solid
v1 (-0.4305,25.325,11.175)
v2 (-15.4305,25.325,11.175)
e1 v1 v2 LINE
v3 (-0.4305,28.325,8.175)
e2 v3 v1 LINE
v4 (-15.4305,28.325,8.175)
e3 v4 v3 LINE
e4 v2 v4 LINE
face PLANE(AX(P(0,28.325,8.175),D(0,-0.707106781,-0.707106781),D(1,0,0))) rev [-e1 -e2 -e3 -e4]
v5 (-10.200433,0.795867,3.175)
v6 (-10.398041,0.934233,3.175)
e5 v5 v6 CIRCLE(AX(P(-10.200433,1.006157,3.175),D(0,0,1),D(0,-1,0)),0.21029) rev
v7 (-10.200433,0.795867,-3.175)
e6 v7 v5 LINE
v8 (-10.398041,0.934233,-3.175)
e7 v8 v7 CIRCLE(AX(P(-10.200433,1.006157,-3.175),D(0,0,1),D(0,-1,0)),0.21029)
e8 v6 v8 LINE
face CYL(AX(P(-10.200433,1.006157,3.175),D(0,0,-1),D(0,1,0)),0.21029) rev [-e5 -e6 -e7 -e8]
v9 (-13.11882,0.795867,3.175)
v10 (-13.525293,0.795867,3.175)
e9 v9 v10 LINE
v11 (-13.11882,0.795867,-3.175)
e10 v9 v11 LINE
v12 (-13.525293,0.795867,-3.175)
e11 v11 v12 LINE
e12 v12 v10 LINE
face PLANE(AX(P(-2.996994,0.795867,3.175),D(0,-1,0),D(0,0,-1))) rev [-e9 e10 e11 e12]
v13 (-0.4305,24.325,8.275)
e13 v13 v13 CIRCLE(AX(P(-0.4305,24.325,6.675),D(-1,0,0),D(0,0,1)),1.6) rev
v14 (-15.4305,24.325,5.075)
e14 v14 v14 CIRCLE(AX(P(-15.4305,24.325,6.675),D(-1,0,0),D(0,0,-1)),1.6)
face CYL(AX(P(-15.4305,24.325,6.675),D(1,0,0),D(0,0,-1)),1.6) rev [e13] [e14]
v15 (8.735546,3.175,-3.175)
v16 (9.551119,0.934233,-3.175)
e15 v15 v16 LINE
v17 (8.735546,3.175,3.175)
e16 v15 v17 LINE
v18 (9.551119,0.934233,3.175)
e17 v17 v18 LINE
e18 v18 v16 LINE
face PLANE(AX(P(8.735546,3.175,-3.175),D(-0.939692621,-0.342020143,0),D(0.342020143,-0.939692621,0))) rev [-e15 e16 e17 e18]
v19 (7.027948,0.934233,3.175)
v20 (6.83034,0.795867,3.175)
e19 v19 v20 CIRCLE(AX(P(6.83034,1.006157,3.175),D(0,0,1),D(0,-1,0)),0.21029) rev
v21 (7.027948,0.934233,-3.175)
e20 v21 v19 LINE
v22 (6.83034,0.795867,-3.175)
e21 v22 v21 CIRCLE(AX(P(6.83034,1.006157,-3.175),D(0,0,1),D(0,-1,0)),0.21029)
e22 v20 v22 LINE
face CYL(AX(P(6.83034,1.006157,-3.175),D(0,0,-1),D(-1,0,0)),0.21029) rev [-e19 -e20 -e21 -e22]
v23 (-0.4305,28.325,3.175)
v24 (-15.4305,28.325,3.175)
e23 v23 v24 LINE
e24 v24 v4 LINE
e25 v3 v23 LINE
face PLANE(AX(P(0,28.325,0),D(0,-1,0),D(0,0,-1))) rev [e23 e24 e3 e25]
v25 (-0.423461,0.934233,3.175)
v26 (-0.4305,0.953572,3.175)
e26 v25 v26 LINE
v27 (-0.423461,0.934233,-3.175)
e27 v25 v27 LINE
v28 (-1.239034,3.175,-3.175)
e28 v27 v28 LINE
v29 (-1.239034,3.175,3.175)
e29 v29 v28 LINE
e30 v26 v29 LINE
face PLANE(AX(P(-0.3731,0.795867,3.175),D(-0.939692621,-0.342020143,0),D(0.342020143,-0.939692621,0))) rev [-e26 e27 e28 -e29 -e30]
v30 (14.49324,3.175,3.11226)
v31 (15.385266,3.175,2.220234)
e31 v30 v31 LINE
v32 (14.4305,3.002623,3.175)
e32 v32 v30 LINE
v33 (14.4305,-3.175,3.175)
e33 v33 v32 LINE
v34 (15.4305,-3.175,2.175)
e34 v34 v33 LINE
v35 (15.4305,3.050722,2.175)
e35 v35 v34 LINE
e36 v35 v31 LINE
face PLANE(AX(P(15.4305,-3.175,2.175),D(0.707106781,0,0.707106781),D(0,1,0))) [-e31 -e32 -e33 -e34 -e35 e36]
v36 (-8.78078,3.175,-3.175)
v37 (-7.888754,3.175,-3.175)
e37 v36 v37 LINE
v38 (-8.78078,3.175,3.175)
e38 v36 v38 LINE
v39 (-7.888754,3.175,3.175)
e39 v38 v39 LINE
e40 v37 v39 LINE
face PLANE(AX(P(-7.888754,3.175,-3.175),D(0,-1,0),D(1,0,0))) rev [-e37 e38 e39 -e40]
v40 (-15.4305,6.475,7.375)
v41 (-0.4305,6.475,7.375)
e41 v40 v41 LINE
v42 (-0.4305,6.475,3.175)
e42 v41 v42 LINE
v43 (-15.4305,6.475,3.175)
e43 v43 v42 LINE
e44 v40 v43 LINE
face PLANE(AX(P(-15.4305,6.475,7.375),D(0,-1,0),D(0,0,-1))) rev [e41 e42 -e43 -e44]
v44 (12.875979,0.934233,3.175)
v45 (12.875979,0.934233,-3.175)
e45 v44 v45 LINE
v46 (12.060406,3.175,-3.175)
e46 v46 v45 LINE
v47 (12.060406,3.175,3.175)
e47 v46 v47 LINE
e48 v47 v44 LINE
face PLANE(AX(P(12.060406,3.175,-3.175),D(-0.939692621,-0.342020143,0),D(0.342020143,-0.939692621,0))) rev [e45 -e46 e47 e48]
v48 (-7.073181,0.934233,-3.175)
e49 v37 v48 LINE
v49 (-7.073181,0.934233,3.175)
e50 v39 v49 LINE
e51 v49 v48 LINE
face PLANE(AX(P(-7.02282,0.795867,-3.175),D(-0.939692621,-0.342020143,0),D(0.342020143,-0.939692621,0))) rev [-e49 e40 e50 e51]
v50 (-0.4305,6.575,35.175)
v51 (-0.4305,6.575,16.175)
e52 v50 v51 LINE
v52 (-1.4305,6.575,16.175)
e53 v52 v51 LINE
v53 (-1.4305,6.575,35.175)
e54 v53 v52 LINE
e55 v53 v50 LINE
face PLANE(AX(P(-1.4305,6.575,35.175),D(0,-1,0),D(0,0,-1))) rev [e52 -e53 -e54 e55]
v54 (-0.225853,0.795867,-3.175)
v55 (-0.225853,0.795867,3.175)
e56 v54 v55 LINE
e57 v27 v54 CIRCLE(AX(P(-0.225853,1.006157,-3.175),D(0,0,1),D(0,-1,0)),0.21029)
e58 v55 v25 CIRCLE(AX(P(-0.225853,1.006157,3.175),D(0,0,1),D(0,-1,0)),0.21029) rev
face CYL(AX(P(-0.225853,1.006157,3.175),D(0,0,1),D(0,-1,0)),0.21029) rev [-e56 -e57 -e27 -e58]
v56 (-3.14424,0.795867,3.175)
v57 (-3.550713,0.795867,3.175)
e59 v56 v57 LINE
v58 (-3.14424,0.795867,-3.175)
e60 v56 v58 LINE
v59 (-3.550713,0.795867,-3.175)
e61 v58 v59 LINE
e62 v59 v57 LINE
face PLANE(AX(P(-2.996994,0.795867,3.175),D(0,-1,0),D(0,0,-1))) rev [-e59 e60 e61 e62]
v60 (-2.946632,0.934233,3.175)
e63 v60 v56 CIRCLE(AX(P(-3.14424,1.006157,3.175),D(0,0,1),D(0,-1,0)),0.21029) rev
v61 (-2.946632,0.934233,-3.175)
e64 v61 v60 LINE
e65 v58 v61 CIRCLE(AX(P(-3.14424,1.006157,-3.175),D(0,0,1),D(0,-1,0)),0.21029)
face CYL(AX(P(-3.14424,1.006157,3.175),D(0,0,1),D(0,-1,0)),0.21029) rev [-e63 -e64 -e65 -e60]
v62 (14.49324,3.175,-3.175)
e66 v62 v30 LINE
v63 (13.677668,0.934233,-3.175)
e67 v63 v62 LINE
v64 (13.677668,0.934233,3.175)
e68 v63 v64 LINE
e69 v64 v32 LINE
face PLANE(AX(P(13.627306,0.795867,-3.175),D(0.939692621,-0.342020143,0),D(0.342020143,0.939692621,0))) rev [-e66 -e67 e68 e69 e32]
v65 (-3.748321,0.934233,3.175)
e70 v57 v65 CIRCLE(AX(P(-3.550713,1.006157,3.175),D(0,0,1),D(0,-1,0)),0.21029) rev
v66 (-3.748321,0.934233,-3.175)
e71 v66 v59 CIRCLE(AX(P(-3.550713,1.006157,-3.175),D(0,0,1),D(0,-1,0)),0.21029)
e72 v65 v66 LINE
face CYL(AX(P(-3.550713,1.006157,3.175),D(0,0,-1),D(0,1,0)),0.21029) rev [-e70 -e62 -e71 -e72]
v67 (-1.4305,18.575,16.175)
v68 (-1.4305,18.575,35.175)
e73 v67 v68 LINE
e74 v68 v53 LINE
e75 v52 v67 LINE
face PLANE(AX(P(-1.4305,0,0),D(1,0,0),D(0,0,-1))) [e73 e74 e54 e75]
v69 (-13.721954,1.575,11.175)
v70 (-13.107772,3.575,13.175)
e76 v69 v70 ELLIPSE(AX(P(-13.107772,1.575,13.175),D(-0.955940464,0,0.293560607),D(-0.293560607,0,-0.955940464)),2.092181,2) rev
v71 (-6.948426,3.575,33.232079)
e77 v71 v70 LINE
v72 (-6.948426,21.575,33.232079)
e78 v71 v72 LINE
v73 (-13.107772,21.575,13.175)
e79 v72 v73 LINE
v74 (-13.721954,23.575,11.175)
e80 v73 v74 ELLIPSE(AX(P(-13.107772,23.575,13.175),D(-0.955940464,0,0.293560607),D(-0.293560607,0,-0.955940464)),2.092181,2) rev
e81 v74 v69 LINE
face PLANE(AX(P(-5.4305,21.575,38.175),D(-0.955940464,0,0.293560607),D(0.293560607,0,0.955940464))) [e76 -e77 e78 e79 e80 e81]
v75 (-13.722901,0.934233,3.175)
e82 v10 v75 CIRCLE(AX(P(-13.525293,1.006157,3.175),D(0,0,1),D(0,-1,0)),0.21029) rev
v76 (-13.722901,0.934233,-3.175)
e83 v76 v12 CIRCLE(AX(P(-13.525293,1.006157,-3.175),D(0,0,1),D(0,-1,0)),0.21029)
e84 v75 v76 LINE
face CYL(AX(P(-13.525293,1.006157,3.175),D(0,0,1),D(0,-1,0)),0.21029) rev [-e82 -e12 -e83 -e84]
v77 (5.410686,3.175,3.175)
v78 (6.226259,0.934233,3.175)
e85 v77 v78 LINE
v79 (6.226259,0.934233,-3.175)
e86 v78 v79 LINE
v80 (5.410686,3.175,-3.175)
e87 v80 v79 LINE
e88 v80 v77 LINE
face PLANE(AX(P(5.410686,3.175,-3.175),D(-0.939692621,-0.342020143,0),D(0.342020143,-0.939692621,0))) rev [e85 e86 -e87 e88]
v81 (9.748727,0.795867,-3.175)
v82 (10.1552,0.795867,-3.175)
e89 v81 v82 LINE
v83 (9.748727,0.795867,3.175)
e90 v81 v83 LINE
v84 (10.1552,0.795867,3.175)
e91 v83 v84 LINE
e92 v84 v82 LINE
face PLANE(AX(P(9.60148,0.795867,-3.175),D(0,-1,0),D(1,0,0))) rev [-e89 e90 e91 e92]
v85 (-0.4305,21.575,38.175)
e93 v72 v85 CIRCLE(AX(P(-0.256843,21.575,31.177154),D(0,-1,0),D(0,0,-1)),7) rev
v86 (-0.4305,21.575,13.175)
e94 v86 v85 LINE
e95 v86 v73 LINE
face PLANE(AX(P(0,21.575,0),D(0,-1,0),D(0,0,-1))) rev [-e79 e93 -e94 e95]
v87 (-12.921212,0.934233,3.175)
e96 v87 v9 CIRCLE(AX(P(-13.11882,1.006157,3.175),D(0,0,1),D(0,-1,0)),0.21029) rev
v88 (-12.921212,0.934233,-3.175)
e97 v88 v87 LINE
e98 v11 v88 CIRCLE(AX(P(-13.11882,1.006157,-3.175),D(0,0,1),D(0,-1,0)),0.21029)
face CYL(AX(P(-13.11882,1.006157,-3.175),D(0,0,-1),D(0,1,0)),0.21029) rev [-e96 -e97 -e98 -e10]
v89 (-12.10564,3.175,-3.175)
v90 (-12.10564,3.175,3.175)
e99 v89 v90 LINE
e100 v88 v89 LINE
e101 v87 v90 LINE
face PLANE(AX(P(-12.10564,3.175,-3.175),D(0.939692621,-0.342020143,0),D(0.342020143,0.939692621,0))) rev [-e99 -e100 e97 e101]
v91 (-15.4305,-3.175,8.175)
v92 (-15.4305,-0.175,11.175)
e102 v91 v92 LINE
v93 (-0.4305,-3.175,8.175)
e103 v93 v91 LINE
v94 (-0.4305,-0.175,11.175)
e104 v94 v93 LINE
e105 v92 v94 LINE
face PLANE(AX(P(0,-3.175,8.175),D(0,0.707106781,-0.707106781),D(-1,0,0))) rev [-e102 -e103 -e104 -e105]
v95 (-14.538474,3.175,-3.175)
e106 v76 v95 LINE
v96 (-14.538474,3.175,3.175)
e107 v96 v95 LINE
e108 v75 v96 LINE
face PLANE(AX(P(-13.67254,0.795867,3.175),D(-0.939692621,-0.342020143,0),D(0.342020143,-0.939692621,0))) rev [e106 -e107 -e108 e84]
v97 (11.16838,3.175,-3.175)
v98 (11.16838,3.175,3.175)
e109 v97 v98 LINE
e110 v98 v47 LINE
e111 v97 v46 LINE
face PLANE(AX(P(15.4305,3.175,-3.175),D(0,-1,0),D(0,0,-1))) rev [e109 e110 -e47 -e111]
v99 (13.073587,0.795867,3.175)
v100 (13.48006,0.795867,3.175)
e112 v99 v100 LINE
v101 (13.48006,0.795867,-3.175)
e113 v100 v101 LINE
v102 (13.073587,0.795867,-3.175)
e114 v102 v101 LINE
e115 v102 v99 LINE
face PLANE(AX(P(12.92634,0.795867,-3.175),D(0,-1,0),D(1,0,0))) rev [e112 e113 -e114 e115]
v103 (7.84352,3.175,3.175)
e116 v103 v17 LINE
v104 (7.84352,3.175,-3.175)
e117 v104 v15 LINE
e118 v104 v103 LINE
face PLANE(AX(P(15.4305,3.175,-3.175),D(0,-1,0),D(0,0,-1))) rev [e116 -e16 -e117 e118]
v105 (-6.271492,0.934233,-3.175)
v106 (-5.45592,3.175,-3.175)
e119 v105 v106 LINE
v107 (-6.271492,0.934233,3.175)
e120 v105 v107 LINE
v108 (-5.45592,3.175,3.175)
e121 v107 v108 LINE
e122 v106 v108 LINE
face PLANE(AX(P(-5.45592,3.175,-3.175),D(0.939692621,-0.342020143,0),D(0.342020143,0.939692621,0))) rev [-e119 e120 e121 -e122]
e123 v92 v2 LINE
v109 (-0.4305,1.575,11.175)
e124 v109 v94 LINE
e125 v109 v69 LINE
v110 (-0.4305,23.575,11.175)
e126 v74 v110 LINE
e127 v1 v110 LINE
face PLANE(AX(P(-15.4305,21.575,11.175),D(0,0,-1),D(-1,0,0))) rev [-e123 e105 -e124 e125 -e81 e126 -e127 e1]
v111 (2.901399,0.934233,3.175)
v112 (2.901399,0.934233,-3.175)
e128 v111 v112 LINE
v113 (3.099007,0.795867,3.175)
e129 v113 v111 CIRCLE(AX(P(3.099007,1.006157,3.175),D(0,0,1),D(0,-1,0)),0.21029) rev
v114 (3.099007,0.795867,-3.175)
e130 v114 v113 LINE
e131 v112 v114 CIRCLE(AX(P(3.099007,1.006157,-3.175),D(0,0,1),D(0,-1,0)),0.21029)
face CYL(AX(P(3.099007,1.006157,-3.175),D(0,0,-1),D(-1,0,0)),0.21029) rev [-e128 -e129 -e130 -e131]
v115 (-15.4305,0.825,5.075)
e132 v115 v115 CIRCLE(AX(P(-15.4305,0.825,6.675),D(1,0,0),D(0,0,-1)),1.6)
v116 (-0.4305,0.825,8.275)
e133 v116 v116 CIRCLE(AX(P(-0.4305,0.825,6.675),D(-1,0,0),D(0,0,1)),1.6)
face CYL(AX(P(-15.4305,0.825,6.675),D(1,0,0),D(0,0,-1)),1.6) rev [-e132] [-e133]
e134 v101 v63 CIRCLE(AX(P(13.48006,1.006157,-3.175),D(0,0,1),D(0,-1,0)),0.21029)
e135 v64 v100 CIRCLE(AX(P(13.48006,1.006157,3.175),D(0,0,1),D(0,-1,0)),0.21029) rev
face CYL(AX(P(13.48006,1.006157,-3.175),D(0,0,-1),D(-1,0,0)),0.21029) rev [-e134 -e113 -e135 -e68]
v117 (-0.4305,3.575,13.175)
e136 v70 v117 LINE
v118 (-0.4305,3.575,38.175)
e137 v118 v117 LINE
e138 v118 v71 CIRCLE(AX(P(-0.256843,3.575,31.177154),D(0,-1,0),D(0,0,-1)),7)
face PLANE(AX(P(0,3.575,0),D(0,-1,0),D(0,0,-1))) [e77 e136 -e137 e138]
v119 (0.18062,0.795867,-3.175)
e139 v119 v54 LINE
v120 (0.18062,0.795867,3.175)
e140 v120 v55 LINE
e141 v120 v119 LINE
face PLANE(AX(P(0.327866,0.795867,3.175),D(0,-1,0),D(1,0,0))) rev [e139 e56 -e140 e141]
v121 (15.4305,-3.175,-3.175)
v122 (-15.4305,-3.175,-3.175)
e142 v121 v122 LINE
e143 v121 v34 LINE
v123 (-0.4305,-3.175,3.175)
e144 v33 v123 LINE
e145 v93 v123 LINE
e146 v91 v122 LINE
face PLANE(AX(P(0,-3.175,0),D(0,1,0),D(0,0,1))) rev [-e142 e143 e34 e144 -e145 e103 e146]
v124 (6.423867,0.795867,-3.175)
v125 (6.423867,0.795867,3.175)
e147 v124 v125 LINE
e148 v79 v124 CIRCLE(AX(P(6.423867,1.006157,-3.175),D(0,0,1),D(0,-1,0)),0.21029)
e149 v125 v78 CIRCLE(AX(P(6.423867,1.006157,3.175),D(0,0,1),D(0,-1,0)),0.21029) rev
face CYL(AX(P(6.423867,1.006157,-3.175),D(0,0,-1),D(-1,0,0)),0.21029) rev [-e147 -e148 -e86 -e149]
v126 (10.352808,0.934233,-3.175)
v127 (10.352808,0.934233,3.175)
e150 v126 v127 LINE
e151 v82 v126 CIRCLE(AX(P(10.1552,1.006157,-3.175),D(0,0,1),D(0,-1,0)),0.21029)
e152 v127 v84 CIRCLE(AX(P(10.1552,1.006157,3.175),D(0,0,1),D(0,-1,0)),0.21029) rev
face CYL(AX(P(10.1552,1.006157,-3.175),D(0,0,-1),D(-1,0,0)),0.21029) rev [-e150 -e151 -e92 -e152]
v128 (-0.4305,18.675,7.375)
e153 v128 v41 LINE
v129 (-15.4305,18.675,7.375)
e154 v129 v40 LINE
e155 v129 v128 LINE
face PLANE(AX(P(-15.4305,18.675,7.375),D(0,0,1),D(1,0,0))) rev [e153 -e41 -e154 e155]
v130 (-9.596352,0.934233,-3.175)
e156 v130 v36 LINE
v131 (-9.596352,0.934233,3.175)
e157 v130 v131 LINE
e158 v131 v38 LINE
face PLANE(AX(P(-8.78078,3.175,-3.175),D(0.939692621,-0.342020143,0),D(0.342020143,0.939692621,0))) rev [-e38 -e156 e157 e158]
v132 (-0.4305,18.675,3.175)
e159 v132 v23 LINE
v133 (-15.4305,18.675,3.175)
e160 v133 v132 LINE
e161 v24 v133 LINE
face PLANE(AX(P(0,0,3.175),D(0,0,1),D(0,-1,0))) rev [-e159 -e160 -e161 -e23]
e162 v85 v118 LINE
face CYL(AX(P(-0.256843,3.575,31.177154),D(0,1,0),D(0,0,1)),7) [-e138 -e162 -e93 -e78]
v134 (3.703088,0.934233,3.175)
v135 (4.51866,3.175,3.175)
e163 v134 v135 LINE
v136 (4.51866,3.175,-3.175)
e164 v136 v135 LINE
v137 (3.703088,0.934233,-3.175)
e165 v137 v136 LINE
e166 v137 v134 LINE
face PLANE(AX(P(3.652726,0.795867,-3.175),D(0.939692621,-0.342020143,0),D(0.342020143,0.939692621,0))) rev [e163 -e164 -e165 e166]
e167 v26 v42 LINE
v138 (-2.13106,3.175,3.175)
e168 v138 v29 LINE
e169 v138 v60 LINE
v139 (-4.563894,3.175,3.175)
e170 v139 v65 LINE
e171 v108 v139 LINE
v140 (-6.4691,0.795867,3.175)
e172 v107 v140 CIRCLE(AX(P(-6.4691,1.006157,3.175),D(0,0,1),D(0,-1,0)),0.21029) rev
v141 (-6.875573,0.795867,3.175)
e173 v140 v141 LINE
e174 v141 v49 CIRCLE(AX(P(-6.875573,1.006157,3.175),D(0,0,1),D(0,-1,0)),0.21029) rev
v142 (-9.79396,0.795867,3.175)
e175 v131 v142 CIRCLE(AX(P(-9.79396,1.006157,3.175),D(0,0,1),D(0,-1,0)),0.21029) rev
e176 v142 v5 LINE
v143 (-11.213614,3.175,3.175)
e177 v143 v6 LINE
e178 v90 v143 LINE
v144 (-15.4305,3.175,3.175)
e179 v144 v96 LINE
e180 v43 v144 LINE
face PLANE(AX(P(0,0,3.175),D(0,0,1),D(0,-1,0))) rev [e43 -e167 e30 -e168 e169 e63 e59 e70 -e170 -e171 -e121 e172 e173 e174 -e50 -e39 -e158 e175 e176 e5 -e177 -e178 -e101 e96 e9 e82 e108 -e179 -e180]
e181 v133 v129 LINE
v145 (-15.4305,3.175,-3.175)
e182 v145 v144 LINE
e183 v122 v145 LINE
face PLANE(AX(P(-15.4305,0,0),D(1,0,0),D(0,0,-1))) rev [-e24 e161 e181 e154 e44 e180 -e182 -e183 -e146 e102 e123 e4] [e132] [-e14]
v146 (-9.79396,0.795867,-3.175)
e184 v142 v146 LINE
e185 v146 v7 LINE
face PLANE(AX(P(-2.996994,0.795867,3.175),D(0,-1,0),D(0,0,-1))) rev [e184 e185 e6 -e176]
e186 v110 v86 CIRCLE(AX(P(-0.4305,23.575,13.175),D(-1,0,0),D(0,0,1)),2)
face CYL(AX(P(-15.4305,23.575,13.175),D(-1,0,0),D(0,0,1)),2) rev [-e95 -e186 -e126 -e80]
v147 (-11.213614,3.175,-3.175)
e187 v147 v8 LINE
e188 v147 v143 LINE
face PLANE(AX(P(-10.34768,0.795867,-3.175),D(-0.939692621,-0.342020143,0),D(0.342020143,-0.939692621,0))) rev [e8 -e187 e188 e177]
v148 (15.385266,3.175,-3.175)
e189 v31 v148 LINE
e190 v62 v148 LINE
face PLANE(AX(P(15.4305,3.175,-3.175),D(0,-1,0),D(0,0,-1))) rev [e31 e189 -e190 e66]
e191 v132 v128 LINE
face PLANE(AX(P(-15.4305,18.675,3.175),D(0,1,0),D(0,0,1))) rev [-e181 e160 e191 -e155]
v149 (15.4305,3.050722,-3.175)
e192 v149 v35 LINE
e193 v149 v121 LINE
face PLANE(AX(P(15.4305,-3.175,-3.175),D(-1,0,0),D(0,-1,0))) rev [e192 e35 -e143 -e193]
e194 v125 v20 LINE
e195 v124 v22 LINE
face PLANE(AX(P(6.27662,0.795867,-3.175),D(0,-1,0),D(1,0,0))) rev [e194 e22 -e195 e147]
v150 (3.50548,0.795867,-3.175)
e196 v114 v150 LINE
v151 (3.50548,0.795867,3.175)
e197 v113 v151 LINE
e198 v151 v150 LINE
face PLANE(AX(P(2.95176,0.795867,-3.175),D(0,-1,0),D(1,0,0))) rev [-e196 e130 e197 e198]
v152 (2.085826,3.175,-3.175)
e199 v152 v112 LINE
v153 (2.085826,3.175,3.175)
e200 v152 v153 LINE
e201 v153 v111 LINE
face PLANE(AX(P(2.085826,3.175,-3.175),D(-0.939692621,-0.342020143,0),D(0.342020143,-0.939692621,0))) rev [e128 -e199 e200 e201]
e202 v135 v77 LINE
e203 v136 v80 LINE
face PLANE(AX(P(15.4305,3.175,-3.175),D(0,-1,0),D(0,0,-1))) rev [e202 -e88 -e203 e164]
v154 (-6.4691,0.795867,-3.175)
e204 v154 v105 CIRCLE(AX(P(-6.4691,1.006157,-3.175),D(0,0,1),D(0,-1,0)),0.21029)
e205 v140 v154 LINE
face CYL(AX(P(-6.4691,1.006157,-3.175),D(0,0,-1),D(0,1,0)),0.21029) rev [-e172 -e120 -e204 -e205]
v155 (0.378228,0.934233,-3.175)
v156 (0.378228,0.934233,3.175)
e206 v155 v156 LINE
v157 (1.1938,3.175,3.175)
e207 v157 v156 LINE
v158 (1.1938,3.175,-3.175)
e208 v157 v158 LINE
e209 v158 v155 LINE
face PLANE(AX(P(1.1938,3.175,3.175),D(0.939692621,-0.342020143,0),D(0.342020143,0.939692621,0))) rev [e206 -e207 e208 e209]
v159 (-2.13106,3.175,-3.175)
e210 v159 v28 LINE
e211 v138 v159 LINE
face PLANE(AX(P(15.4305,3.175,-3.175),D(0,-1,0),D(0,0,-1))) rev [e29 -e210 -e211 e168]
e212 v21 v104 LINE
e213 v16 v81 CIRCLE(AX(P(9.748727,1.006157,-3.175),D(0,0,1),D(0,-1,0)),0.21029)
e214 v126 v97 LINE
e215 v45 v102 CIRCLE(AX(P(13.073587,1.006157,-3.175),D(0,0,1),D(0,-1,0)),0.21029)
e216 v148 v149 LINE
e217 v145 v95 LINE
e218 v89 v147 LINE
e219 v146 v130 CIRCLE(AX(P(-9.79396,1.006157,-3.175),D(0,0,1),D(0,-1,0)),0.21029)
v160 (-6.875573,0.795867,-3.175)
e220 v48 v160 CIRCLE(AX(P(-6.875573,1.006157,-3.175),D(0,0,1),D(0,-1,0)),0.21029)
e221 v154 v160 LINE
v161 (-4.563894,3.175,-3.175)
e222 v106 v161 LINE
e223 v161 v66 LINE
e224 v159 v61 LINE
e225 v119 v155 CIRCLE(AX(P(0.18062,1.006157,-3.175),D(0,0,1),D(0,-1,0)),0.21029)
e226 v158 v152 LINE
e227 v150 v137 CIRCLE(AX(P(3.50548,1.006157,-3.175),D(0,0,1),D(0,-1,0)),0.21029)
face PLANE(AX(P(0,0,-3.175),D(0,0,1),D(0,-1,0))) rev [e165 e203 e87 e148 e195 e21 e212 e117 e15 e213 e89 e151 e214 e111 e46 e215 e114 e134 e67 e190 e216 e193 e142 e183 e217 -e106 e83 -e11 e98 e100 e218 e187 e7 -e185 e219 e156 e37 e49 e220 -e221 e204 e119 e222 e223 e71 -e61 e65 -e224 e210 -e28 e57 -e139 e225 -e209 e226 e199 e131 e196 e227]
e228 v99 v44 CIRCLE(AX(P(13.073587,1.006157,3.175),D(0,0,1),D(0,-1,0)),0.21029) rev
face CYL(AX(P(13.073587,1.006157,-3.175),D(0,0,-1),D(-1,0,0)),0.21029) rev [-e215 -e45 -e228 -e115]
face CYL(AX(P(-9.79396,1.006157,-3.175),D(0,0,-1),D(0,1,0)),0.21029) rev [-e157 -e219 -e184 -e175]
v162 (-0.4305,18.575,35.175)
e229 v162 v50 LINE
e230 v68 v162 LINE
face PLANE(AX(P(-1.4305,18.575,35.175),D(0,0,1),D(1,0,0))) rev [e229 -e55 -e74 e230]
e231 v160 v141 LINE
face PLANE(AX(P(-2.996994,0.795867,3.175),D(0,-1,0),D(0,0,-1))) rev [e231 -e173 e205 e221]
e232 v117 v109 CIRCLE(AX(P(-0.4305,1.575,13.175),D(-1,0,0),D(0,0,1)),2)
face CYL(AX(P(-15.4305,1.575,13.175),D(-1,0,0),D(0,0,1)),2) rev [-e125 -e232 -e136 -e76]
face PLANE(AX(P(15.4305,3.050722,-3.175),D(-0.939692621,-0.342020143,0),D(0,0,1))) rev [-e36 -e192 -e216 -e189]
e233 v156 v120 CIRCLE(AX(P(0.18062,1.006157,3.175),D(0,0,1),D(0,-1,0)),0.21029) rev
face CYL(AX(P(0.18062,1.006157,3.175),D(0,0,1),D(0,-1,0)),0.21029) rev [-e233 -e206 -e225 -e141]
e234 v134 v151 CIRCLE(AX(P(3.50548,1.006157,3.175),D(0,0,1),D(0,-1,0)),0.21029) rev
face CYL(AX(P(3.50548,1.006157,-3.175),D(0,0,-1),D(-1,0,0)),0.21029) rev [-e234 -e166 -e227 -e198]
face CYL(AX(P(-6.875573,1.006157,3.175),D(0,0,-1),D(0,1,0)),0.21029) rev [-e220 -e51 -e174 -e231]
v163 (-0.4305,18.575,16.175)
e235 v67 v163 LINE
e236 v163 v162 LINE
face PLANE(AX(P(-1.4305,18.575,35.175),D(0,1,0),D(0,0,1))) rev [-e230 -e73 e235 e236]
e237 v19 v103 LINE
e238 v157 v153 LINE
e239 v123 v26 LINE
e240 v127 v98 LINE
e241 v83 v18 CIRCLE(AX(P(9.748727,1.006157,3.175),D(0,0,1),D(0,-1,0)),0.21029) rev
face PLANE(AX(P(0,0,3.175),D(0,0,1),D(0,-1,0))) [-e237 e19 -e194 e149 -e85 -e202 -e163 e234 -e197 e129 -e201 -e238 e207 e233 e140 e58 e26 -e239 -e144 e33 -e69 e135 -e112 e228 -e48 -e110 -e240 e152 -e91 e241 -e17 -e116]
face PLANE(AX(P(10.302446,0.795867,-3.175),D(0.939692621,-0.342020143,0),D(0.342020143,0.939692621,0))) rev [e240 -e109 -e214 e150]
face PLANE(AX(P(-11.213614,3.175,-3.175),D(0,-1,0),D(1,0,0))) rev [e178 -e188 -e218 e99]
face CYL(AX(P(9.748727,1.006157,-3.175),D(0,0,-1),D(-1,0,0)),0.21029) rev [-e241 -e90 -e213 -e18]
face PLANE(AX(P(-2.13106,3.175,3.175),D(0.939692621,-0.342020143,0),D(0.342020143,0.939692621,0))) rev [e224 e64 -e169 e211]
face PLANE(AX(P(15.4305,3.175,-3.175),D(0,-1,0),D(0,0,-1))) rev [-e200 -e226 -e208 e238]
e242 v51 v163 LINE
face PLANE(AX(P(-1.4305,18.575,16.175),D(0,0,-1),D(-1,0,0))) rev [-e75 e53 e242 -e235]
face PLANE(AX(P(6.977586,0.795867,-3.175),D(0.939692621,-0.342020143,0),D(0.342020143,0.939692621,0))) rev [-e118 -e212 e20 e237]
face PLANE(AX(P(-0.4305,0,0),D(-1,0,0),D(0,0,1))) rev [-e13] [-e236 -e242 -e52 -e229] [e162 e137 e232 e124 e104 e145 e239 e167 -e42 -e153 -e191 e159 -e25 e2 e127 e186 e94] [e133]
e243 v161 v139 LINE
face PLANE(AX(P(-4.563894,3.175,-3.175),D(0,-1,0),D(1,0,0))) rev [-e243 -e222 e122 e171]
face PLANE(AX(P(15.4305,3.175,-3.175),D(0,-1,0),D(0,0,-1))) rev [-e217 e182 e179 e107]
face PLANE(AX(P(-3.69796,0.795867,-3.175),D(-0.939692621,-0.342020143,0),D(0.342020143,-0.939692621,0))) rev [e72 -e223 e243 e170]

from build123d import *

# Parameters (mm, degrees)
BOSS_EXTRUDE1_DEPTH  = 18
SKETCH2_W            = 8.291454006
SKETCH2_H            = 18
BOSS_EXTRUDE2_DEPTH  = 8
SKETCH3_W            = 8
SKETCH3_H            = 18
BOSS_EXTRUDE3_DEPTH  = 1.708545994
SKETCH4_W            = 10
SKETCH4_H            = 8
BOSS_EXTRUDE4_DEPTH  = 6.75
BOSS_EXTRUDE5_DEPTH  = 5
SKETCH6_W            = 30.861
SKETCH6_H            = 6.35
BOSS_EXTRUDE6_DEPTH  = 6.35
SKETCH7_W            = 15
SKETCH7_H            = 8
BOSS_EXTRUDE7_DEPTH  = 6.75
CUT_EXTRUDE1_DEPTH   = 6.35
CUT_EXTRUDE2_DEPTH   = 6.35
BOSS_EXTRUDE8_DEPTH  = 6.35
BOSS_EXTRUDE9_DEPTH  = 6.35
BOSS_EXTRUDE10_DEPTH = 6.35
CUT_EXTRUDE3_DEPTH   = 48.596280897
CUT_EXTRUDE4_DEPTH   = 48.596280897
CUT_EXTRUDE5_DEPTH   = 48.596280897
CUT_EXTRUDE6_DEPTH   = 48.596280897
SKETCH17_W           = 4.2
SKETCH17_H           = 12.2
CUT_EXTRUDE7_DEPTH   = 51.111950381
CHAMFER1_SIZE        = 3
FILLET1_START        = -4
FILLET1_DEPTH        = 8
FILLET1_START_2      = -3.175
FILLET1_2_DEPTH      = 6.35
FILLET1_START_3      = 12.448968436
FILLET1_3_OUTLINE_W  = 5
FILLET1_3_OUTLINE_H  = 8.175
FILLET1_3_DEPTH      = 1.551031564
FILLET2_R            = 2
SKETCH20_W           = 19
SKETCH20_H           = 12
CUT_EXTRUDE8_DEPTH   = 1
SKETCH21_R           = 1.6
CUT_EXTRUDE9_DEPTH   = 51.111950381
FILLET3_R            = 7


with BuildPart() as part:
    # Sketch1 → Boss-Extrude1 (new body)
    with BuildSketch(Plane.XZ.offset(-3.575)):
        Polygon((-13.721954006, 11.175), (-5.4305, 11.175), (-5.4305, 38.175), align=None)
    extrude(amount=-BOSS_EXTRUDE1_DEPTH)

    # Sketch2 → Boss-Extrude2 (add)
    with BuildSketch(Plane(origin=(0, 0, 11.175), x_dir=(-1, 0, 0), z_dir=(0, 0, -1))):
        with Locations((9.576227003, 12.575)):
            Rectangle(SKETCH2_W, SKETCH2_H)
    extrude(amount=BOSS_EXTRUDE2_DEPTH)

    # Sketch3 → Boss-Extrude3 (add)
    with BuildSketch(Plane.ZY.offset(13.721954006)):
        with Locations((7.175, 12.575)):
            Rectangle(SKETCH3_W, SKETCH3_H)
    extrude(amount=BOSS_EXTRUDE3_DEPTH)

    # Sketch4 → Boss-Extrude4 (add)
    with BuildSketch(Plane.XZ.offset(-3.575)):
        with Locations((-10.4305, 7.175)):
            Rectangle(SKETCH4_W, SKETCH4_H)
    extrude(amount=BOSS_EXTRUDE4_DEPTH)

    # Sketch5 → Boss-Extrude5 (add)
    with BuildSketch(Plane(origin=(-5.4305, 0, 0), x_dir=(0, 0, -1), z_dir=(1, 0, 0))):
        Polygon((-3.175, 21.575), (-3.175, -3.175), (-11.175, -3.175), (-11.175, 3.575), (-38.175, 3.575), (-38.175, 21.575), align=None)
    extrude(amount=BOSS_EXTRUDE5_DEPTH)

    # Sketch6 → Boss-Extrude6 (add)
    with BuildSketch(Plane(origin=(0, 0, 3.175), x_dir=(-1, 0, 0), z_dir=(0, 0, -1))):
        Rectangle(SKETCH6_W, SKETCH6_H)
    extrude(amount=BOSS_EXTRUDE6_DEPTH)

    # Sketch7 → Boss-Extrude7 (add)
    with BuildSketch(Plane(origin=(0, 21.575, 0), x_dir=(-1, 0, 0), z_dir=(0, 1, 0))):
        with Locations((7.9305, 7.175)):
            Rectangle(SKETCH7_W, SKETCH7_H)
    extrude(amount=BOSS_EXTRUDE7_DEPTH)

    # Sketch8 → Cut-Extrude1 (cut)
    with BuildSketch(Plane(origin=(0, 0, -3.175), x_dir=(-1, 0, 0), z_dir=(0, 0, -1))):
        Polygon((1.239033663, 3.175), (-1.1938, 3.175), (-0.327866283, 0.795866667), (0.373099946, 0.795866667), align=None)
    extrude(amount=-CUT_EXTRUDE1_DEPTH, mode=Mode.SUBTRACT)

    # Sketch9 → Cut-Extrude2 (cut)
    with BuildSketch(Plane(origin=(0, 0, -3.175), x_dir=(-1, 0, 0), z_dir=(0, 0, -1))):
        Polygon((2.13106, 3.175), (2.996993717, 0.795866667), (13.672539946, 0.795866667), (14.538473663, 3.175), align=None)
    extrude(amount=-CUT_EXTRUDE2_DEPTH, mode=Mode.SUBTRACT)

    # Sketch10 → Boss-Extrude8 (add)
    with BuildSketch(Plane(origin=(0, 0, 3.175), x_dir=(-1, 0, 0), z_dir=(0, 0, -1))):
        Polygon((10.347679946, 0.795866667), (11.213613663, 3.175), (12.10564, 3.175), (12.971573717, 0.795866667), align=None)
    extrude(amount=BOSS_EXTRUDE8_DEPTH)

    # Sketch11 → Boss-Extrude9 (add)
    with BuildSketch(Plane(origin=(0, 0, 3.175), x_dir=(-1, 0, 0), z_dir=(0, 0, -1))):
        Polygon((7.022819946, 0.795866667), (7.888753663, 3.175), (8.78078, 3.175), (9.646713717, 0.795866667), align=None)
    extrude(amount=BOSS_EXTRUDE9_DEPTH)

    # Sketch12 → Boss-Extrude10 (add)
    with BuildSketch(Plane(origin=(0, 0, 3.175), x_dir=(-1, 0, 0), z_dir=(0, 0, -1))):
        Polygon((3.697959946, 0.795866667), (4.563893663, 3.175), (5.45592, 3.175), (6.321853717, 0.795866667), align=None)
    extrude(amount=BOSS_EXTRUDE10_DEPTH)

    # Sketch13 → Cut-Extrude3 (cut, through all)
    with BuildSketch(Plane.XY.offset(3.175)):
        Polygon((2.085826337, 3.175), (2.951760054, 0.795866667), (3.652726283, 0.795866667), (4.51866, 3.175), align=None)
    extrude(amount=-CUT_EXTRUDE3_DEPTH, mode=Mode.SUBTRACT)

    # Sketch14 → Cut-Extrude4 (cut, through all)
    with BuildSketch(Plane.XY.offset(3.175)):
        Polygon((5.410686337, 3.175), (6.276620054, 0.795866667), (6.977586283, 0.795866667), (7.84352, 3.175), align=None)
    extrude(amount=-CUT_EXTRUDE4_DEPTH, mode=Mode.SUBTRACT)

    # Sketch15 → Cut-Extrude5 (cut, through all)
    with BuildSketch(Plane.XY.offset(3.175)):
        Polygon((8.735546337, 3.175), (9.601480054, 0.795866667), (10.302446283, 0.795866667), (11.16838, 3.175), align=None)
    extrude(amount=-CUT_EXTRUDE5_DEPTH, mode=Mode.SUBTRACT)

    # Sketch16 → Cut-Extrude6 (cut, through all)
    with BuildSketch(Plane.XY.offset(3.175)):
        Polygon((12.060406337, 3.175), (12.926340054, 0.795866667), (13.627306283, 0.795866667), (14.49324, 3.175), align=None)
    extrude(amount=-CUT_EXTRUDE6_DEPTH, mode=Mode.SUBTRACT)

    # Sketch17 → Cut-Extrude7 (cut, through all)
    with BuildSketch(Plane(origin=(-0.4305, 0, 0), x_dir=(0, 0, -1), z_dir=(1, 0, 0))):
        with Locations((-5.275, 12.575)):
            Rectangle(SKETCH17_W, SKETCH17_H)
    extrude(amount=-CUT_EXTRUDE7_DEPTH, mode=Mode.SUBTRACT)

    # Chamfer1
    chamfer1_edges = [part.edges().sort_by_distance(p)[0] for p in [
        (-7.9305, -3.175, 11.175),
        (-7.9305, 28.325, 11.175),
    ]]
    chamfer(chamfer1_edges, length=CHAMFER1_SIZE)

    # Fillet1: read off the stored shape, not the designer's step
    # Fillet1 outline → Fillet1 (cut)
    with BuildSketch(Plane.XY.offset(FILLET1_START)):
        Polygon((15.4305, 3.175), (15.385266337, 3.175), (15.4305, 3.050721534), align=None)
    extrude(amount=FILLET1_DEPTH, mode=Mode.SUBTRACT)

    # Fillet1 2 outline → Fillet1 2 (add)
    with BuildSketch(Plane.XY.offset(FILLET1_START_2)):
        with BuildLine():
            Line((12.926340054, 0.795866667), (13.073586605, 0.795866667))
            ThreePointArc((13.073586605, 0.795866667), (12.952969292, 0.83389716), (12.875978768, 0.934233164))
            Line((12.875978768, 0.934233164), (12.926340054, 0.795866667))
        make_face()
        with BuildLine():
            Line((13.627306283, 0.795866667), (13.67766757, 0.934233164))
            ThreePointArc((13.67766757, 0.934233164), (13.600677045, 0.83389716), (13.480059732, 0.795866667))
            Line((13.480059732, 0.795866667), (13.627306283, 0.795866667))
        make_face()
        with BuildLine():
            Line((-3.697959946, 0.795866667), (-3.550713395, 0.795866667))
            ThreePointArc((-3.550713395, 0.795866667), (-3.671330708, 0.83389716), (-3.748321232, 0.934233164))
            Line((-3.748321232, 0.934233164), (-3.697959946, 0.795866667))
        make_face()
        with BuildLine():
            ThreePointArc((-2.94663243, 0.934233164), (-3.023622955, 0.83389716), (-3.144240268, 0.795866667))
            Line((-3.144240268, 0.795866667), (-2.996993717, 0.795866667))
            Line((-2.996993717, 0.795866667), (-2.94663243, 0.934233164))
        make_face()
        with BuildLine():
            Line((6.977586283, 0.795866667), (7.02794757, 0.934233164))
            ThreePointArc((7.02794757, 0.934233164), (6.950957045, 0.83389716), (6.830339732, 0.795866667))
            Line((6.830339732, 0.795866667), (6.977586283, 0.795866667))
        make_face()
        with BuildLine():
            Line((6.276620054, 0.795866667), (6.423866605, 0.795866667))
            ThreePointArc((6.423866605, 0.795866667), (6.303249292, 0.83389716), (6.226258768, 0.934233164))
            Line((6.226258768, 0.934233164), (6.276620054, 0.795866667))
        make_face()
        with BuildLine():
            Line((3.652726283, 0.795866667), (3.70308757, 0.934233164))
            ThreePointArc((3.70308757, 0.934233164), (3.626097045, 0.83389716), (3.505479732, 0.795866667))
            Line((3.505479732, 0.795866667), (3.652726283, 0.795866667))
        make_face()
        with BuildLine():
            Line((2.951760054, 0.795866667), (3.099006605, 0.795866667))
            ThreePointArc((3.099006605, 0.795866667), (2.978389292, 0.83389716), (2.901398768, 0.934233164))
            Line((2.901398768, 0.934233164), (2.951760054, 0.795866667))
        make_face()
        with BuildLine():
            Line((10.302446283, 0.795866667), (10.35280757, 0.934233164))
            ThreePointArc((10.35280757, 0.934233164), (10.275817045, 0.83389716), (10.155199732, 0.795866667))
            Line((10.155199732, 0.795866667), (10.302446283, 0.795866667))
        make_face()
        with BuildLine():
            Line((9.601480054, 0.795866667), (9.748726605, 0.795866667))
            ThreePointArc((9.748726605, 0.795866667), (9.628109292, 0.83389716), (9.551118768, 0.934233164))
            Line((9.551118768, 0.934233164), (9.601480054, 0.795866667))
        make_face()
        with BuildLine():
            Line((-6.321853717, 0.795866667), (-6.27149243, 0.934233164))
            ThreePointArc((-6.27149243, 0.934233164), (-6.348482955, 0.83389716), (-6.469100268, 0.795866667))
            Line((-6.469100268, 0.795866667), (-6.321853717, 0.795866667))
        make_face()
        with BuildLine():
            Line((-7.022819946, 0.795866667), (-6.875573395, 0.795866667))
            ThreePointArc((-6.875573395, 0.795866667), (-6.996190708, 0.83389716), (-7.073181232, 0.934233164))
            Line((-7.073181232, 0.934233164), (-7.022819946, 0.795866667))
        make_face()
        with BuildLine():
            Line((-9.646713717, 0.795866667), (-9.59635243, 0.934233164))
            ThreePointArc((-9.59635243, 0.934233164), (-9.673342955, 0.83389716), (-9.793960268, 0.795866667))
            Line((-9.793960268, 0.795866667), (-9.646713717, 0.795866667))
        make_face()
        with BuildLine():
            Line((-10.347679946, 0.795866667), (-10.200433395, 0.795866667))
            ThreePointArc((-10.200433395, 0.795866667), (-10.321050708, 0.83389716), (-10.398041232, 0.934233164))
            Line((-10.398041232, 0.934233164), (-10.347679946, 0.795866667))
        make_face()
        with BuildLine():
            ThreePointArc((0.37822757, 0.934233164), (0.301237045, 0.83389716), (0.180619732, 0.795866667))
            Line((0.180619732, 0.795866667), (0.327866283, 0.795866667))
            Line((0.327866283, 0.795866667), (0.37822757, 0.934233164))
        make_face()
        with BuildLine():
            ThreePointArc((-0.225853395, 0.795866667), (-0.346470708, 0.83389716), (-0.423461232, 0.934233164))
            Line((-0.423461232, 0.934233164), (-0.373099946, 0.795866667))
            Line((-0.373099946, 0.795866667), (-0.225853395, 0.795866667))
        make_face()
        with BuildLine():
            ThreePointArc((-12.92121243, 0.934233164), (-12.998202955, 0.83389716), (-13.118820268, 0.795866667))
            Line((-13.118820268, 0.795866667), (-12.971573717, 0.795866667))
            Line((-12.971573717, 0.795866667), (-12.92121243, 0.934233164))
        make_face()
        with BuildLine():
            ThreePointArc((-13.525293395, 0.795866667), (-13.645910708, 0.83389716), (-13.722901232, 0.934233164))
            Line((-13.722901232, 0.934233164), (-13.672539946, 0.795866667))
            Line((-13.672539946, 0.795866667), (-13.525293395, 0.795866667))
        make_face()
    extrude(amount=FILLET1_2_DEPTH)

    # Fillet1 3 outline → Fillet1 3 (cut)
    with BuildSketch(Plane(origin=(0, 0, 0), x_dir=(0.707106781186548, 0, -0.707106781186547), z_dir=(0.707106781186547, 0, 0.707106781186548)).offset(FILLET1_START_3)):
        with Locations((8.5, -0.9125)):
            Rectangle(FILLET1_3_OUTLINE_W, FILLET1_3_OUTLINE_H)
    extrude(amount=FILLET1_3_DEPTH, mode=Mode.SUBTRACT)

    # Fillet2
    fillet2_edges = [part.edges().sort_by_distance(p)[0] for p in [
        (-7.076227003, 3.575, 11.175),
        (-7.076227003, 21.575, 11.175),
    ]]
    fillet(fillet2_edges, radius=FILLET2_R)

    # Sketch20 → Cut-Extrude8 (cut)
    with BuildSketch(Plane(origin=(-0.4305, 0, 0), x_dir=(0, 0, -1), z_dir=(1, 0, 0))):
        with Locations((-25.675, 12.575)):
            Rectangle(SKETCH20_W, SKETCH20_H)
    extrude(amount=-CUT_EXTRUDE8_DEPTH, mode=Mode.SUBTRACT)

    # Sketch21 → Cut-Extrude9 (cut, symmetric)
    with BuildSketch(Plane(origin=(-0.4305, 0, 0), x_dir=(0, 0, -1), z_dir=(1, 0, 0))):
        with Locations((-6.675, 0.825)):
            Circle(SKETCH21_R)
    cut_extrude9 = extrude(amount=CUT_EXTRUDE9_DEPTH, both=True, mode=Mode.SUBTRACT)

    # Mirror1: Cut-Extrude9 across plane
    add(cut_extrude9.mirror(Plane(origin=(0, 12.575, 0), x_dir=(0, 0, 1), z_dir=(0, -1, 0))), mode=Mode.SUBTRACT)

    # Fillet3
    # the kernel refuses this fillet: 7 mm, written as the material it takes off along each edge
    with BuildSketch(Plane(origin=(-5.4305, -9.351854629, 38.175), x_dir=(1, 0, 0), z_dir=(0, 1, 0))) as fillet3_piece_1:
        with BuildLine():
            CenterArc((5.17365713, 6.997845611), FILLET3_R, 197.071245119, 71.507206098)
            Line((-1.517926116, 4.942921363), (-1.651757781, 4.901822878))
            Line((-1.651757781, 4.901822878), (-0.133831665, -0.041098485))
            Line((-0.133831665, -0.041098485), (0, -0.14))
            ThreePointArc((0, -0.14), (2.5, -0.14), (4.996526857, -0.139956912))
            Line((4.996526857, -0.139956912), (5, 0))
        make_face()
    extrude(amount=43.853709258, mode=Mode.SUBTRACT)


solid = part.part
